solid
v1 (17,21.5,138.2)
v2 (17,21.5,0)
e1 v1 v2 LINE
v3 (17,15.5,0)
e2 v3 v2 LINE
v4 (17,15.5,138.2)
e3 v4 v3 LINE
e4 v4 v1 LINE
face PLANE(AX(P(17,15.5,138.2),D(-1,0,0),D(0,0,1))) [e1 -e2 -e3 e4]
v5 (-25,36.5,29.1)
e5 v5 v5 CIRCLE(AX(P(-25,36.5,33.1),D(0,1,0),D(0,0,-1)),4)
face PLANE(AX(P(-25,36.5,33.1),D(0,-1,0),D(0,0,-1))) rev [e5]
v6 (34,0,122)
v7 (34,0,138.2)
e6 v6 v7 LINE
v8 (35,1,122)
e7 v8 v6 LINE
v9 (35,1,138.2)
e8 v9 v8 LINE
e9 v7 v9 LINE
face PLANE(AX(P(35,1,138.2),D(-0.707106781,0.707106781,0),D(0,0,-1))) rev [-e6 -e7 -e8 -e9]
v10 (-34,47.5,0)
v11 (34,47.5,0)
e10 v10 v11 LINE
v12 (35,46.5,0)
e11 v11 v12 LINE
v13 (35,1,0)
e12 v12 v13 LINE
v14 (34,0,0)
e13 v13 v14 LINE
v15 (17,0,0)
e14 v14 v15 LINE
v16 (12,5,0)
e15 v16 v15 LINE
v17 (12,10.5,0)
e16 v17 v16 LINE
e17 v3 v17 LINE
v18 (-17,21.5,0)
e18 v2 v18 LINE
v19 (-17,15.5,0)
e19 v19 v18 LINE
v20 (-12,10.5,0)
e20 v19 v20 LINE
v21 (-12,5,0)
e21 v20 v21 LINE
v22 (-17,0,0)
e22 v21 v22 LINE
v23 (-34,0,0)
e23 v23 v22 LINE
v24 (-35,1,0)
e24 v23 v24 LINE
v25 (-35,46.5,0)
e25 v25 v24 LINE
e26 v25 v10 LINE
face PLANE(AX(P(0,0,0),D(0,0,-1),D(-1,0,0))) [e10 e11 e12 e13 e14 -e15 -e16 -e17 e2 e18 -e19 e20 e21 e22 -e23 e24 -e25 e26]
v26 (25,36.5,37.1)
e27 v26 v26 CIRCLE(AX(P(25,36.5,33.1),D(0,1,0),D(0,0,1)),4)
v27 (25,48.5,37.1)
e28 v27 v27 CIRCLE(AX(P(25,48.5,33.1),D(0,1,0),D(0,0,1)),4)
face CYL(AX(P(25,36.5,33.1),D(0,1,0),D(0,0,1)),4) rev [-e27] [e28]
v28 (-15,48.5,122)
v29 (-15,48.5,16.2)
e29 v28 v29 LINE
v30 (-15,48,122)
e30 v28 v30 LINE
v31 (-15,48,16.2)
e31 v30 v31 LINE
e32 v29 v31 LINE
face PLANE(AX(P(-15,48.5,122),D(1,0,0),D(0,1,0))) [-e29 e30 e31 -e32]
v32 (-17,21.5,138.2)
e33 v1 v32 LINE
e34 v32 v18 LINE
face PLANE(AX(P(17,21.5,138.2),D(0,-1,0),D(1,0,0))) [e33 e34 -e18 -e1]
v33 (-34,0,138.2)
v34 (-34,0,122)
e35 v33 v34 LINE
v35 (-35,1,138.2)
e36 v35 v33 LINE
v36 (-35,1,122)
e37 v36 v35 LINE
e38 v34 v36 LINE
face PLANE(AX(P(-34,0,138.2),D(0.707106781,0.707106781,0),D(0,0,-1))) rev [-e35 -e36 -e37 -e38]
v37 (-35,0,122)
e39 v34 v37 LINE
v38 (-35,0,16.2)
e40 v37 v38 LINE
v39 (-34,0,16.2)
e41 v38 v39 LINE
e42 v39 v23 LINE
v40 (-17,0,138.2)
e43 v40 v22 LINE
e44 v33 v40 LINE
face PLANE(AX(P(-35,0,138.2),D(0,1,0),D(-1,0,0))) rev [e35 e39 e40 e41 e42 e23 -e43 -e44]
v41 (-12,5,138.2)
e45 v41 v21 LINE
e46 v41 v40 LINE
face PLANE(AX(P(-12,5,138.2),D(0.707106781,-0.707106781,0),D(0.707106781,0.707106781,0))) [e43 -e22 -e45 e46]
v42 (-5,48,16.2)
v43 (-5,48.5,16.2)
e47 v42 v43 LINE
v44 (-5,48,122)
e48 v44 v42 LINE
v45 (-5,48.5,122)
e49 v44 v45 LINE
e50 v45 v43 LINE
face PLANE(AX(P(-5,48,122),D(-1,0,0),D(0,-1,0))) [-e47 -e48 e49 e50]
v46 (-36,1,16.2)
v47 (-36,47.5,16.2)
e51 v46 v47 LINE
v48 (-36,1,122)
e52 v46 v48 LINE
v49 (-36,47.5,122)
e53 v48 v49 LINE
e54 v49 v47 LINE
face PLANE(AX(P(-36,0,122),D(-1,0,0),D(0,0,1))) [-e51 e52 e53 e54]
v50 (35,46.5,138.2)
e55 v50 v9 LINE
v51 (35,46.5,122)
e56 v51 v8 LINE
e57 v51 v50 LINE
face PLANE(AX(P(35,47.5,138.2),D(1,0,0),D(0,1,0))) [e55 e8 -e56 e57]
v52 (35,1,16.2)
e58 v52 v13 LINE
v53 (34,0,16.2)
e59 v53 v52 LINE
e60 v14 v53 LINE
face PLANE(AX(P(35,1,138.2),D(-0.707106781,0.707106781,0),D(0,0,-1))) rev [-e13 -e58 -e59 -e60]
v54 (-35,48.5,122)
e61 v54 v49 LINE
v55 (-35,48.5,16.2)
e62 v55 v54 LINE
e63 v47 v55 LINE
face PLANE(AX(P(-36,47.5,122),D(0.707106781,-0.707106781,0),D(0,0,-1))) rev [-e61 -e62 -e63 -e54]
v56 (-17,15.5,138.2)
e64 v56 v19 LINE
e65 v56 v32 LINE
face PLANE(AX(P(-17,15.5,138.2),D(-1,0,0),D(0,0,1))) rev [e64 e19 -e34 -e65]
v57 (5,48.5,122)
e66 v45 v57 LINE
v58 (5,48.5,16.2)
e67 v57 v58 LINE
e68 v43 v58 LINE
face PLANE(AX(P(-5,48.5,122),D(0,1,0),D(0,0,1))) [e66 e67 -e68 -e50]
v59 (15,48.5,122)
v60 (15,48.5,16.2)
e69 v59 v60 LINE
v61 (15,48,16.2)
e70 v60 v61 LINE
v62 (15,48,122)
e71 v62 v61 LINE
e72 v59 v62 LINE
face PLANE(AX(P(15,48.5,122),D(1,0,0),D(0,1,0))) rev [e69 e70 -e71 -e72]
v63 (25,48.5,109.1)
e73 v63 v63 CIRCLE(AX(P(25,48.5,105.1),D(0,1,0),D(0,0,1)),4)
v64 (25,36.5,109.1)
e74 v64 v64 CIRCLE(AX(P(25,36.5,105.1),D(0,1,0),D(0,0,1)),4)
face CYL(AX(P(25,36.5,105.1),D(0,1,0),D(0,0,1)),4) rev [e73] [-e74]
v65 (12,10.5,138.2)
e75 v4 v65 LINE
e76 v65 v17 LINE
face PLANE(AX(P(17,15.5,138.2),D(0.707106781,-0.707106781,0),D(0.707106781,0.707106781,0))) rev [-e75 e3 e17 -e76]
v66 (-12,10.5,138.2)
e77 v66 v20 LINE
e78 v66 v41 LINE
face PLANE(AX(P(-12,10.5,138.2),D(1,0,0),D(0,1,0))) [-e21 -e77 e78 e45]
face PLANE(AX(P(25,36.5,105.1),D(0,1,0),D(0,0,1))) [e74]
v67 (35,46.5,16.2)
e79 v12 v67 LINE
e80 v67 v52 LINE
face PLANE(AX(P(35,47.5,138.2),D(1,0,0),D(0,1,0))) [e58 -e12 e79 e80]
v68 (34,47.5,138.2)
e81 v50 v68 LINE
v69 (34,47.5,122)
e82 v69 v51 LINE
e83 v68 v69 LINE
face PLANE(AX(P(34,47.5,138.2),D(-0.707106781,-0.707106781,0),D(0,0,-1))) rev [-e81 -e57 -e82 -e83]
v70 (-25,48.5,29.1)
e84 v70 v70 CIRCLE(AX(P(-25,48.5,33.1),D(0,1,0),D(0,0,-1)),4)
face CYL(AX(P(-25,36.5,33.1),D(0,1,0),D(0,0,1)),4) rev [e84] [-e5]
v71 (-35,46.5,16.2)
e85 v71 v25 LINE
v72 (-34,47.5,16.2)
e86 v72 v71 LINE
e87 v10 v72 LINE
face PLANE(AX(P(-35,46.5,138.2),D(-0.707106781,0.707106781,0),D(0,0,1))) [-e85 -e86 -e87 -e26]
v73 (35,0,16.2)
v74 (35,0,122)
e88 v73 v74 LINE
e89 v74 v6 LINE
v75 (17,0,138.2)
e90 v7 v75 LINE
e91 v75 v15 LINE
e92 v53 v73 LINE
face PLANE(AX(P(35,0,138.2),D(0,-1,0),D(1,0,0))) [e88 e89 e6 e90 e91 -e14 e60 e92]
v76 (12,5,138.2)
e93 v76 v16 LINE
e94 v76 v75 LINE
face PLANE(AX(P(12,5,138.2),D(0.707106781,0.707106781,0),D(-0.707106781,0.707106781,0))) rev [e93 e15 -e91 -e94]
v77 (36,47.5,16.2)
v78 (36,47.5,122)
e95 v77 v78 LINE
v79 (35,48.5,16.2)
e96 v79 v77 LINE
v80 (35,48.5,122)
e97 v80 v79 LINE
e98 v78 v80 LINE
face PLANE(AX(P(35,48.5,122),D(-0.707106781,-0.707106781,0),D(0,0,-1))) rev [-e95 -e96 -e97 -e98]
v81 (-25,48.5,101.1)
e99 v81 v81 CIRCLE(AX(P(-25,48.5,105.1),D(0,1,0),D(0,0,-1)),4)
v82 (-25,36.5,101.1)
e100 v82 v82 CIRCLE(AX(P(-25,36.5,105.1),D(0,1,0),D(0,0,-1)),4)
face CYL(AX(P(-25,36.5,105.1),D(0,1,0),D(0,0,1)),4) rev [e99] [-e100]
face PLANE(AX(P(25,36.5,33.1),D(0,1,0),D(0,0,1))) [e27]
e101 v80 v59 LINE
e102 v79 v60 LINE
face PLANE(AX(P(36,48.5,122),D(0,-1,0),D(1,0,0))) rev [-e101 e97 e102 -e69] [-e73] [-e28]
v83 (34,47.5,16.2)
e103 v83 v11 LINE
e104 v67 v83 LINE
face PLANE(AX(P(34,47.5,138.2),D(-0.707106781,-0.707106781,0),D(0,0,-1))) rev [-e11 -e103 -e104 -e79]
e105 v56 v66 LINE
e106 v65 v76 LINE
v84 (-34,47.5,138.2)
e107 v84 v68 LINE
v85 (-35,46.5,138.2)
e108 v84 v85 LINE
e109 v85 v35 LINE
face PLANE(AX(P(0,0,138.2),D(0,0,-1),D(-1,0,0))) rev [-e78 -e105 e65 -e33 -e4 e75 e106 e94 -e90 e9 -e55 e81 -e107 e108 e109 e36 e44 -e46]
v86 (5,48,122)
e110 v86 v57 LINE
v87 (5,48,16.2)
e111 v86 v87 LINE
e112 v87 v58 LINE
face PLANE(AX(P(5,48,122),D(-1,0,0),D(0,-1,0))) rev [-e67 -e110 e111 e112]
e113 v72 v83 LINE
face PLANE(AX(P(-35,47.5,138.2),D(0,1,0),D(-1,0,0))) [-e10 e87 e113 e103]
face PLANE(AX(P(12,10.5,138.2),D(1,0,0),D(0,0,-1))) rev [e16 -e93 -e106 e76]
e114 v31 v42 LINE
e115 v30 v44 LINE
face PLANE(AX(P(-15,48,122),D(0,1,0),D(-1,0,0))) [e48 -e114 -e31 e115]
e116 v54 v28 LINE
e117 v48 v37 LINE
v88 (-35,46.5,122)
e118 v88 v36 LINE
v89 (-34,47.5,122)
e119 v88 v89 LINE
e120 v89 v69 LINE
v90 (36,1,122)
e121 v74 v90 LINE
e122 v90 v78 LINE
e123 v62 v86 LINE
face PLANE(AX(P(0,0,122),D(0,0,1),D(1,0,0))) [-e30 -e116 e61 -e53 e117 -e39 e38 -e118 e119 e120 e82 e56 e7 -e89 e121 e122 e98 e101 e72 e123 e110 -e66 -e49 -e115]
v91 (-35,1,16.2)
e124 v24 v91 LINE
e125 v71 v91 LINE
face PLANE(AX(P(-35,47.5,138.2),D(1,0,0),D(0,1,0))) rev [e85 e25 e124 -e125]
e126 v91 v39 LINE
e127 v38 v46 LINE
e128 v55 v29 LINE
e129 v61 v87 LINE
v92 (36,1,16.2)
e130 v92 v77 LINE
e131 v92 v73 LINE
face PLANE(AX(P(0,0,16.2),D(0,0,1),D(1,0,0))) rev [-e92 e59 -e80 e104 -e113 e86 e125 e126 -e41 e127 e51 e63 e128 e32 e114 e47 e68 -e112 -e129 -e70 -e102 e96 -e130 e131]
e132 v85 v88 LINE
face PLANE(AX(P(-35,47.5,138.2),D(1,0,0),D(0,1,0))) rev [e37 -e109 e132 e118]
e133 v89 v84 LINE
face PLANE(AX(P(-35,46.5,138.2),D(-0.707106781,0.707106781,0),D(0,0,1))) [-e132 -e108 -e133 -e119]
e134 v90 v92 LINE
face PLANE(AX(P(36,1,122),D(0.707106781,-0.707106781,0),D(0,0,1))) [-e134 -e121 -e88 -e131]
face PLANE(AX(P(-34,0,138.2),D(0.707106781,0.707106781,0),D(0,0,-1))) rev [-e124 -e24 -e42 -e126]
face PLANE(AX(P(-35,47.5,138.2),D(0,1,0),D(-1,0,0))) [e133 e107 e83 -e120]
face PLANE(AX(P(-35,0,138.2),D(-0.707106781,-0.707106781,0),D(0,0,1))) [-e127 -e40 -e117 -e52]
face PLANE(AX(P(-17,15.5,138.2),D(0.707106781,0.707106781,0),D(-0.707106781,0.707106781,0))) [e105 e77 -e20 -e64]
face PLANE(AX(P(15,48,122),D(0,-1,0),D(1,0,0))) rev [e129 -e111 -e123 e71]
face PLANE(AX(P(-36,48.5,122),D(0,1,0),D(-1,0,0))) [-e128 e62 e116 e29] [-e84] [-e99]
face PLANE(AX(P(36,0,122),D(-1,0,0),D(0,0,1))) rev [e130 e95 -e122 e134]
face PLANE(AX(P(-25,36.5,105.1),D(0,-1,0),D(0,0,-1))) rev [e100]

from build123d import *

# Parameters (mm, degrees)
EXTRUDE_1_DEPTH     = 138.2
EXTRUDE_2_DEPTH     = 52.9
SKETCH_4_R          = 4
CUT_EXTRUDE_1_DEPTH = 12
CHAMFER_1_SIZE      = 1


with BuildPart() as part:
    # 草图1 → 凸台-拉伸1 (new body)
    with BuildSketch(Plane.XY):
        Polygon((-35, 47.5), (35, 47.5), (35, 0), (17, 0), (12, 5), (12, 10.5), (17, 15.5), (17, 21.5), (-17, 21.5), (-17, 15.5), (-12, 10.5), (-12, 5), (-17, 0), (-35, 0), align=None)
    extrude(amount=EXTRUDE_1_DEPTH)

    # 草图2 → 凸台-拉伸2 (add, symmetric)
    with BuildSketch(Plane.XY.offset(69.1)):
        Polygon((-36, 0), (-35, 0), (-35, 47.5), (35, 47.5), (35, 0), (36, 0), (36, 48.5), (15, 48.5), (15, 48), (5, 48), (5, 48.5), (-5, 48.5), (-5, 48), (-15, 48), (-15, 48.5), (-36, 48.5), align=None)
    extrude(amount=EXTRUDE_2_DEPTH, both=True)

    # 草图4 → 切除-拉伸1 (cut)
    with BuildSketch(Plane(origin=(0, 48.5, 0), x_dir=(1, 0, 0), z_dir=(0, 1, 0))):
        with Locations(Location((25, -33.1, 0), (0, 0, 270))):
            Circle(SKETCH_4_R)
        with Locations(Location((25, -105.1, 0), (0, 0, 270))):
            Circle(SKETCH_4_R)
        with Locations(Location((-25, -105.1, 0), (0, 0, 90))):
            Circle(SKETCH_4_R)
        with Locations(Location((-25, -33.1, 0), (0, 0, 90))):
            Circle(SKETCH_4_R)
    extrude(amount=-CUT_EXTRUDE_1_DEPTH, mode=Mode.SUBTRACT)

    # 倒角1
    chamfer_1_edges = [part.edges().sort_by_distance(p)[0] for p in [
        (35, 47.5, 8.1),
        (-35, 47.5, 8.1),
        (35, 0, 8.1),
        (-35, 0, 8.1),
        (36, 0, 69.1),
        (35, 0, 130.1),
        (-35, 0, 130.1),
        (-36, 0, 69.1),
        (36, 48.5, 69.1),
        (-36, 48.5, 69.1),
        (35, 47.5, 130.1),
        (-35, 47.5, 130.1),
    ]]
    chamfer(chamfer_1_edges, length=CHAMFER_1_SIZE - 0.0001)  # a hair under: the kernel refuses the full size


solid = part.part
